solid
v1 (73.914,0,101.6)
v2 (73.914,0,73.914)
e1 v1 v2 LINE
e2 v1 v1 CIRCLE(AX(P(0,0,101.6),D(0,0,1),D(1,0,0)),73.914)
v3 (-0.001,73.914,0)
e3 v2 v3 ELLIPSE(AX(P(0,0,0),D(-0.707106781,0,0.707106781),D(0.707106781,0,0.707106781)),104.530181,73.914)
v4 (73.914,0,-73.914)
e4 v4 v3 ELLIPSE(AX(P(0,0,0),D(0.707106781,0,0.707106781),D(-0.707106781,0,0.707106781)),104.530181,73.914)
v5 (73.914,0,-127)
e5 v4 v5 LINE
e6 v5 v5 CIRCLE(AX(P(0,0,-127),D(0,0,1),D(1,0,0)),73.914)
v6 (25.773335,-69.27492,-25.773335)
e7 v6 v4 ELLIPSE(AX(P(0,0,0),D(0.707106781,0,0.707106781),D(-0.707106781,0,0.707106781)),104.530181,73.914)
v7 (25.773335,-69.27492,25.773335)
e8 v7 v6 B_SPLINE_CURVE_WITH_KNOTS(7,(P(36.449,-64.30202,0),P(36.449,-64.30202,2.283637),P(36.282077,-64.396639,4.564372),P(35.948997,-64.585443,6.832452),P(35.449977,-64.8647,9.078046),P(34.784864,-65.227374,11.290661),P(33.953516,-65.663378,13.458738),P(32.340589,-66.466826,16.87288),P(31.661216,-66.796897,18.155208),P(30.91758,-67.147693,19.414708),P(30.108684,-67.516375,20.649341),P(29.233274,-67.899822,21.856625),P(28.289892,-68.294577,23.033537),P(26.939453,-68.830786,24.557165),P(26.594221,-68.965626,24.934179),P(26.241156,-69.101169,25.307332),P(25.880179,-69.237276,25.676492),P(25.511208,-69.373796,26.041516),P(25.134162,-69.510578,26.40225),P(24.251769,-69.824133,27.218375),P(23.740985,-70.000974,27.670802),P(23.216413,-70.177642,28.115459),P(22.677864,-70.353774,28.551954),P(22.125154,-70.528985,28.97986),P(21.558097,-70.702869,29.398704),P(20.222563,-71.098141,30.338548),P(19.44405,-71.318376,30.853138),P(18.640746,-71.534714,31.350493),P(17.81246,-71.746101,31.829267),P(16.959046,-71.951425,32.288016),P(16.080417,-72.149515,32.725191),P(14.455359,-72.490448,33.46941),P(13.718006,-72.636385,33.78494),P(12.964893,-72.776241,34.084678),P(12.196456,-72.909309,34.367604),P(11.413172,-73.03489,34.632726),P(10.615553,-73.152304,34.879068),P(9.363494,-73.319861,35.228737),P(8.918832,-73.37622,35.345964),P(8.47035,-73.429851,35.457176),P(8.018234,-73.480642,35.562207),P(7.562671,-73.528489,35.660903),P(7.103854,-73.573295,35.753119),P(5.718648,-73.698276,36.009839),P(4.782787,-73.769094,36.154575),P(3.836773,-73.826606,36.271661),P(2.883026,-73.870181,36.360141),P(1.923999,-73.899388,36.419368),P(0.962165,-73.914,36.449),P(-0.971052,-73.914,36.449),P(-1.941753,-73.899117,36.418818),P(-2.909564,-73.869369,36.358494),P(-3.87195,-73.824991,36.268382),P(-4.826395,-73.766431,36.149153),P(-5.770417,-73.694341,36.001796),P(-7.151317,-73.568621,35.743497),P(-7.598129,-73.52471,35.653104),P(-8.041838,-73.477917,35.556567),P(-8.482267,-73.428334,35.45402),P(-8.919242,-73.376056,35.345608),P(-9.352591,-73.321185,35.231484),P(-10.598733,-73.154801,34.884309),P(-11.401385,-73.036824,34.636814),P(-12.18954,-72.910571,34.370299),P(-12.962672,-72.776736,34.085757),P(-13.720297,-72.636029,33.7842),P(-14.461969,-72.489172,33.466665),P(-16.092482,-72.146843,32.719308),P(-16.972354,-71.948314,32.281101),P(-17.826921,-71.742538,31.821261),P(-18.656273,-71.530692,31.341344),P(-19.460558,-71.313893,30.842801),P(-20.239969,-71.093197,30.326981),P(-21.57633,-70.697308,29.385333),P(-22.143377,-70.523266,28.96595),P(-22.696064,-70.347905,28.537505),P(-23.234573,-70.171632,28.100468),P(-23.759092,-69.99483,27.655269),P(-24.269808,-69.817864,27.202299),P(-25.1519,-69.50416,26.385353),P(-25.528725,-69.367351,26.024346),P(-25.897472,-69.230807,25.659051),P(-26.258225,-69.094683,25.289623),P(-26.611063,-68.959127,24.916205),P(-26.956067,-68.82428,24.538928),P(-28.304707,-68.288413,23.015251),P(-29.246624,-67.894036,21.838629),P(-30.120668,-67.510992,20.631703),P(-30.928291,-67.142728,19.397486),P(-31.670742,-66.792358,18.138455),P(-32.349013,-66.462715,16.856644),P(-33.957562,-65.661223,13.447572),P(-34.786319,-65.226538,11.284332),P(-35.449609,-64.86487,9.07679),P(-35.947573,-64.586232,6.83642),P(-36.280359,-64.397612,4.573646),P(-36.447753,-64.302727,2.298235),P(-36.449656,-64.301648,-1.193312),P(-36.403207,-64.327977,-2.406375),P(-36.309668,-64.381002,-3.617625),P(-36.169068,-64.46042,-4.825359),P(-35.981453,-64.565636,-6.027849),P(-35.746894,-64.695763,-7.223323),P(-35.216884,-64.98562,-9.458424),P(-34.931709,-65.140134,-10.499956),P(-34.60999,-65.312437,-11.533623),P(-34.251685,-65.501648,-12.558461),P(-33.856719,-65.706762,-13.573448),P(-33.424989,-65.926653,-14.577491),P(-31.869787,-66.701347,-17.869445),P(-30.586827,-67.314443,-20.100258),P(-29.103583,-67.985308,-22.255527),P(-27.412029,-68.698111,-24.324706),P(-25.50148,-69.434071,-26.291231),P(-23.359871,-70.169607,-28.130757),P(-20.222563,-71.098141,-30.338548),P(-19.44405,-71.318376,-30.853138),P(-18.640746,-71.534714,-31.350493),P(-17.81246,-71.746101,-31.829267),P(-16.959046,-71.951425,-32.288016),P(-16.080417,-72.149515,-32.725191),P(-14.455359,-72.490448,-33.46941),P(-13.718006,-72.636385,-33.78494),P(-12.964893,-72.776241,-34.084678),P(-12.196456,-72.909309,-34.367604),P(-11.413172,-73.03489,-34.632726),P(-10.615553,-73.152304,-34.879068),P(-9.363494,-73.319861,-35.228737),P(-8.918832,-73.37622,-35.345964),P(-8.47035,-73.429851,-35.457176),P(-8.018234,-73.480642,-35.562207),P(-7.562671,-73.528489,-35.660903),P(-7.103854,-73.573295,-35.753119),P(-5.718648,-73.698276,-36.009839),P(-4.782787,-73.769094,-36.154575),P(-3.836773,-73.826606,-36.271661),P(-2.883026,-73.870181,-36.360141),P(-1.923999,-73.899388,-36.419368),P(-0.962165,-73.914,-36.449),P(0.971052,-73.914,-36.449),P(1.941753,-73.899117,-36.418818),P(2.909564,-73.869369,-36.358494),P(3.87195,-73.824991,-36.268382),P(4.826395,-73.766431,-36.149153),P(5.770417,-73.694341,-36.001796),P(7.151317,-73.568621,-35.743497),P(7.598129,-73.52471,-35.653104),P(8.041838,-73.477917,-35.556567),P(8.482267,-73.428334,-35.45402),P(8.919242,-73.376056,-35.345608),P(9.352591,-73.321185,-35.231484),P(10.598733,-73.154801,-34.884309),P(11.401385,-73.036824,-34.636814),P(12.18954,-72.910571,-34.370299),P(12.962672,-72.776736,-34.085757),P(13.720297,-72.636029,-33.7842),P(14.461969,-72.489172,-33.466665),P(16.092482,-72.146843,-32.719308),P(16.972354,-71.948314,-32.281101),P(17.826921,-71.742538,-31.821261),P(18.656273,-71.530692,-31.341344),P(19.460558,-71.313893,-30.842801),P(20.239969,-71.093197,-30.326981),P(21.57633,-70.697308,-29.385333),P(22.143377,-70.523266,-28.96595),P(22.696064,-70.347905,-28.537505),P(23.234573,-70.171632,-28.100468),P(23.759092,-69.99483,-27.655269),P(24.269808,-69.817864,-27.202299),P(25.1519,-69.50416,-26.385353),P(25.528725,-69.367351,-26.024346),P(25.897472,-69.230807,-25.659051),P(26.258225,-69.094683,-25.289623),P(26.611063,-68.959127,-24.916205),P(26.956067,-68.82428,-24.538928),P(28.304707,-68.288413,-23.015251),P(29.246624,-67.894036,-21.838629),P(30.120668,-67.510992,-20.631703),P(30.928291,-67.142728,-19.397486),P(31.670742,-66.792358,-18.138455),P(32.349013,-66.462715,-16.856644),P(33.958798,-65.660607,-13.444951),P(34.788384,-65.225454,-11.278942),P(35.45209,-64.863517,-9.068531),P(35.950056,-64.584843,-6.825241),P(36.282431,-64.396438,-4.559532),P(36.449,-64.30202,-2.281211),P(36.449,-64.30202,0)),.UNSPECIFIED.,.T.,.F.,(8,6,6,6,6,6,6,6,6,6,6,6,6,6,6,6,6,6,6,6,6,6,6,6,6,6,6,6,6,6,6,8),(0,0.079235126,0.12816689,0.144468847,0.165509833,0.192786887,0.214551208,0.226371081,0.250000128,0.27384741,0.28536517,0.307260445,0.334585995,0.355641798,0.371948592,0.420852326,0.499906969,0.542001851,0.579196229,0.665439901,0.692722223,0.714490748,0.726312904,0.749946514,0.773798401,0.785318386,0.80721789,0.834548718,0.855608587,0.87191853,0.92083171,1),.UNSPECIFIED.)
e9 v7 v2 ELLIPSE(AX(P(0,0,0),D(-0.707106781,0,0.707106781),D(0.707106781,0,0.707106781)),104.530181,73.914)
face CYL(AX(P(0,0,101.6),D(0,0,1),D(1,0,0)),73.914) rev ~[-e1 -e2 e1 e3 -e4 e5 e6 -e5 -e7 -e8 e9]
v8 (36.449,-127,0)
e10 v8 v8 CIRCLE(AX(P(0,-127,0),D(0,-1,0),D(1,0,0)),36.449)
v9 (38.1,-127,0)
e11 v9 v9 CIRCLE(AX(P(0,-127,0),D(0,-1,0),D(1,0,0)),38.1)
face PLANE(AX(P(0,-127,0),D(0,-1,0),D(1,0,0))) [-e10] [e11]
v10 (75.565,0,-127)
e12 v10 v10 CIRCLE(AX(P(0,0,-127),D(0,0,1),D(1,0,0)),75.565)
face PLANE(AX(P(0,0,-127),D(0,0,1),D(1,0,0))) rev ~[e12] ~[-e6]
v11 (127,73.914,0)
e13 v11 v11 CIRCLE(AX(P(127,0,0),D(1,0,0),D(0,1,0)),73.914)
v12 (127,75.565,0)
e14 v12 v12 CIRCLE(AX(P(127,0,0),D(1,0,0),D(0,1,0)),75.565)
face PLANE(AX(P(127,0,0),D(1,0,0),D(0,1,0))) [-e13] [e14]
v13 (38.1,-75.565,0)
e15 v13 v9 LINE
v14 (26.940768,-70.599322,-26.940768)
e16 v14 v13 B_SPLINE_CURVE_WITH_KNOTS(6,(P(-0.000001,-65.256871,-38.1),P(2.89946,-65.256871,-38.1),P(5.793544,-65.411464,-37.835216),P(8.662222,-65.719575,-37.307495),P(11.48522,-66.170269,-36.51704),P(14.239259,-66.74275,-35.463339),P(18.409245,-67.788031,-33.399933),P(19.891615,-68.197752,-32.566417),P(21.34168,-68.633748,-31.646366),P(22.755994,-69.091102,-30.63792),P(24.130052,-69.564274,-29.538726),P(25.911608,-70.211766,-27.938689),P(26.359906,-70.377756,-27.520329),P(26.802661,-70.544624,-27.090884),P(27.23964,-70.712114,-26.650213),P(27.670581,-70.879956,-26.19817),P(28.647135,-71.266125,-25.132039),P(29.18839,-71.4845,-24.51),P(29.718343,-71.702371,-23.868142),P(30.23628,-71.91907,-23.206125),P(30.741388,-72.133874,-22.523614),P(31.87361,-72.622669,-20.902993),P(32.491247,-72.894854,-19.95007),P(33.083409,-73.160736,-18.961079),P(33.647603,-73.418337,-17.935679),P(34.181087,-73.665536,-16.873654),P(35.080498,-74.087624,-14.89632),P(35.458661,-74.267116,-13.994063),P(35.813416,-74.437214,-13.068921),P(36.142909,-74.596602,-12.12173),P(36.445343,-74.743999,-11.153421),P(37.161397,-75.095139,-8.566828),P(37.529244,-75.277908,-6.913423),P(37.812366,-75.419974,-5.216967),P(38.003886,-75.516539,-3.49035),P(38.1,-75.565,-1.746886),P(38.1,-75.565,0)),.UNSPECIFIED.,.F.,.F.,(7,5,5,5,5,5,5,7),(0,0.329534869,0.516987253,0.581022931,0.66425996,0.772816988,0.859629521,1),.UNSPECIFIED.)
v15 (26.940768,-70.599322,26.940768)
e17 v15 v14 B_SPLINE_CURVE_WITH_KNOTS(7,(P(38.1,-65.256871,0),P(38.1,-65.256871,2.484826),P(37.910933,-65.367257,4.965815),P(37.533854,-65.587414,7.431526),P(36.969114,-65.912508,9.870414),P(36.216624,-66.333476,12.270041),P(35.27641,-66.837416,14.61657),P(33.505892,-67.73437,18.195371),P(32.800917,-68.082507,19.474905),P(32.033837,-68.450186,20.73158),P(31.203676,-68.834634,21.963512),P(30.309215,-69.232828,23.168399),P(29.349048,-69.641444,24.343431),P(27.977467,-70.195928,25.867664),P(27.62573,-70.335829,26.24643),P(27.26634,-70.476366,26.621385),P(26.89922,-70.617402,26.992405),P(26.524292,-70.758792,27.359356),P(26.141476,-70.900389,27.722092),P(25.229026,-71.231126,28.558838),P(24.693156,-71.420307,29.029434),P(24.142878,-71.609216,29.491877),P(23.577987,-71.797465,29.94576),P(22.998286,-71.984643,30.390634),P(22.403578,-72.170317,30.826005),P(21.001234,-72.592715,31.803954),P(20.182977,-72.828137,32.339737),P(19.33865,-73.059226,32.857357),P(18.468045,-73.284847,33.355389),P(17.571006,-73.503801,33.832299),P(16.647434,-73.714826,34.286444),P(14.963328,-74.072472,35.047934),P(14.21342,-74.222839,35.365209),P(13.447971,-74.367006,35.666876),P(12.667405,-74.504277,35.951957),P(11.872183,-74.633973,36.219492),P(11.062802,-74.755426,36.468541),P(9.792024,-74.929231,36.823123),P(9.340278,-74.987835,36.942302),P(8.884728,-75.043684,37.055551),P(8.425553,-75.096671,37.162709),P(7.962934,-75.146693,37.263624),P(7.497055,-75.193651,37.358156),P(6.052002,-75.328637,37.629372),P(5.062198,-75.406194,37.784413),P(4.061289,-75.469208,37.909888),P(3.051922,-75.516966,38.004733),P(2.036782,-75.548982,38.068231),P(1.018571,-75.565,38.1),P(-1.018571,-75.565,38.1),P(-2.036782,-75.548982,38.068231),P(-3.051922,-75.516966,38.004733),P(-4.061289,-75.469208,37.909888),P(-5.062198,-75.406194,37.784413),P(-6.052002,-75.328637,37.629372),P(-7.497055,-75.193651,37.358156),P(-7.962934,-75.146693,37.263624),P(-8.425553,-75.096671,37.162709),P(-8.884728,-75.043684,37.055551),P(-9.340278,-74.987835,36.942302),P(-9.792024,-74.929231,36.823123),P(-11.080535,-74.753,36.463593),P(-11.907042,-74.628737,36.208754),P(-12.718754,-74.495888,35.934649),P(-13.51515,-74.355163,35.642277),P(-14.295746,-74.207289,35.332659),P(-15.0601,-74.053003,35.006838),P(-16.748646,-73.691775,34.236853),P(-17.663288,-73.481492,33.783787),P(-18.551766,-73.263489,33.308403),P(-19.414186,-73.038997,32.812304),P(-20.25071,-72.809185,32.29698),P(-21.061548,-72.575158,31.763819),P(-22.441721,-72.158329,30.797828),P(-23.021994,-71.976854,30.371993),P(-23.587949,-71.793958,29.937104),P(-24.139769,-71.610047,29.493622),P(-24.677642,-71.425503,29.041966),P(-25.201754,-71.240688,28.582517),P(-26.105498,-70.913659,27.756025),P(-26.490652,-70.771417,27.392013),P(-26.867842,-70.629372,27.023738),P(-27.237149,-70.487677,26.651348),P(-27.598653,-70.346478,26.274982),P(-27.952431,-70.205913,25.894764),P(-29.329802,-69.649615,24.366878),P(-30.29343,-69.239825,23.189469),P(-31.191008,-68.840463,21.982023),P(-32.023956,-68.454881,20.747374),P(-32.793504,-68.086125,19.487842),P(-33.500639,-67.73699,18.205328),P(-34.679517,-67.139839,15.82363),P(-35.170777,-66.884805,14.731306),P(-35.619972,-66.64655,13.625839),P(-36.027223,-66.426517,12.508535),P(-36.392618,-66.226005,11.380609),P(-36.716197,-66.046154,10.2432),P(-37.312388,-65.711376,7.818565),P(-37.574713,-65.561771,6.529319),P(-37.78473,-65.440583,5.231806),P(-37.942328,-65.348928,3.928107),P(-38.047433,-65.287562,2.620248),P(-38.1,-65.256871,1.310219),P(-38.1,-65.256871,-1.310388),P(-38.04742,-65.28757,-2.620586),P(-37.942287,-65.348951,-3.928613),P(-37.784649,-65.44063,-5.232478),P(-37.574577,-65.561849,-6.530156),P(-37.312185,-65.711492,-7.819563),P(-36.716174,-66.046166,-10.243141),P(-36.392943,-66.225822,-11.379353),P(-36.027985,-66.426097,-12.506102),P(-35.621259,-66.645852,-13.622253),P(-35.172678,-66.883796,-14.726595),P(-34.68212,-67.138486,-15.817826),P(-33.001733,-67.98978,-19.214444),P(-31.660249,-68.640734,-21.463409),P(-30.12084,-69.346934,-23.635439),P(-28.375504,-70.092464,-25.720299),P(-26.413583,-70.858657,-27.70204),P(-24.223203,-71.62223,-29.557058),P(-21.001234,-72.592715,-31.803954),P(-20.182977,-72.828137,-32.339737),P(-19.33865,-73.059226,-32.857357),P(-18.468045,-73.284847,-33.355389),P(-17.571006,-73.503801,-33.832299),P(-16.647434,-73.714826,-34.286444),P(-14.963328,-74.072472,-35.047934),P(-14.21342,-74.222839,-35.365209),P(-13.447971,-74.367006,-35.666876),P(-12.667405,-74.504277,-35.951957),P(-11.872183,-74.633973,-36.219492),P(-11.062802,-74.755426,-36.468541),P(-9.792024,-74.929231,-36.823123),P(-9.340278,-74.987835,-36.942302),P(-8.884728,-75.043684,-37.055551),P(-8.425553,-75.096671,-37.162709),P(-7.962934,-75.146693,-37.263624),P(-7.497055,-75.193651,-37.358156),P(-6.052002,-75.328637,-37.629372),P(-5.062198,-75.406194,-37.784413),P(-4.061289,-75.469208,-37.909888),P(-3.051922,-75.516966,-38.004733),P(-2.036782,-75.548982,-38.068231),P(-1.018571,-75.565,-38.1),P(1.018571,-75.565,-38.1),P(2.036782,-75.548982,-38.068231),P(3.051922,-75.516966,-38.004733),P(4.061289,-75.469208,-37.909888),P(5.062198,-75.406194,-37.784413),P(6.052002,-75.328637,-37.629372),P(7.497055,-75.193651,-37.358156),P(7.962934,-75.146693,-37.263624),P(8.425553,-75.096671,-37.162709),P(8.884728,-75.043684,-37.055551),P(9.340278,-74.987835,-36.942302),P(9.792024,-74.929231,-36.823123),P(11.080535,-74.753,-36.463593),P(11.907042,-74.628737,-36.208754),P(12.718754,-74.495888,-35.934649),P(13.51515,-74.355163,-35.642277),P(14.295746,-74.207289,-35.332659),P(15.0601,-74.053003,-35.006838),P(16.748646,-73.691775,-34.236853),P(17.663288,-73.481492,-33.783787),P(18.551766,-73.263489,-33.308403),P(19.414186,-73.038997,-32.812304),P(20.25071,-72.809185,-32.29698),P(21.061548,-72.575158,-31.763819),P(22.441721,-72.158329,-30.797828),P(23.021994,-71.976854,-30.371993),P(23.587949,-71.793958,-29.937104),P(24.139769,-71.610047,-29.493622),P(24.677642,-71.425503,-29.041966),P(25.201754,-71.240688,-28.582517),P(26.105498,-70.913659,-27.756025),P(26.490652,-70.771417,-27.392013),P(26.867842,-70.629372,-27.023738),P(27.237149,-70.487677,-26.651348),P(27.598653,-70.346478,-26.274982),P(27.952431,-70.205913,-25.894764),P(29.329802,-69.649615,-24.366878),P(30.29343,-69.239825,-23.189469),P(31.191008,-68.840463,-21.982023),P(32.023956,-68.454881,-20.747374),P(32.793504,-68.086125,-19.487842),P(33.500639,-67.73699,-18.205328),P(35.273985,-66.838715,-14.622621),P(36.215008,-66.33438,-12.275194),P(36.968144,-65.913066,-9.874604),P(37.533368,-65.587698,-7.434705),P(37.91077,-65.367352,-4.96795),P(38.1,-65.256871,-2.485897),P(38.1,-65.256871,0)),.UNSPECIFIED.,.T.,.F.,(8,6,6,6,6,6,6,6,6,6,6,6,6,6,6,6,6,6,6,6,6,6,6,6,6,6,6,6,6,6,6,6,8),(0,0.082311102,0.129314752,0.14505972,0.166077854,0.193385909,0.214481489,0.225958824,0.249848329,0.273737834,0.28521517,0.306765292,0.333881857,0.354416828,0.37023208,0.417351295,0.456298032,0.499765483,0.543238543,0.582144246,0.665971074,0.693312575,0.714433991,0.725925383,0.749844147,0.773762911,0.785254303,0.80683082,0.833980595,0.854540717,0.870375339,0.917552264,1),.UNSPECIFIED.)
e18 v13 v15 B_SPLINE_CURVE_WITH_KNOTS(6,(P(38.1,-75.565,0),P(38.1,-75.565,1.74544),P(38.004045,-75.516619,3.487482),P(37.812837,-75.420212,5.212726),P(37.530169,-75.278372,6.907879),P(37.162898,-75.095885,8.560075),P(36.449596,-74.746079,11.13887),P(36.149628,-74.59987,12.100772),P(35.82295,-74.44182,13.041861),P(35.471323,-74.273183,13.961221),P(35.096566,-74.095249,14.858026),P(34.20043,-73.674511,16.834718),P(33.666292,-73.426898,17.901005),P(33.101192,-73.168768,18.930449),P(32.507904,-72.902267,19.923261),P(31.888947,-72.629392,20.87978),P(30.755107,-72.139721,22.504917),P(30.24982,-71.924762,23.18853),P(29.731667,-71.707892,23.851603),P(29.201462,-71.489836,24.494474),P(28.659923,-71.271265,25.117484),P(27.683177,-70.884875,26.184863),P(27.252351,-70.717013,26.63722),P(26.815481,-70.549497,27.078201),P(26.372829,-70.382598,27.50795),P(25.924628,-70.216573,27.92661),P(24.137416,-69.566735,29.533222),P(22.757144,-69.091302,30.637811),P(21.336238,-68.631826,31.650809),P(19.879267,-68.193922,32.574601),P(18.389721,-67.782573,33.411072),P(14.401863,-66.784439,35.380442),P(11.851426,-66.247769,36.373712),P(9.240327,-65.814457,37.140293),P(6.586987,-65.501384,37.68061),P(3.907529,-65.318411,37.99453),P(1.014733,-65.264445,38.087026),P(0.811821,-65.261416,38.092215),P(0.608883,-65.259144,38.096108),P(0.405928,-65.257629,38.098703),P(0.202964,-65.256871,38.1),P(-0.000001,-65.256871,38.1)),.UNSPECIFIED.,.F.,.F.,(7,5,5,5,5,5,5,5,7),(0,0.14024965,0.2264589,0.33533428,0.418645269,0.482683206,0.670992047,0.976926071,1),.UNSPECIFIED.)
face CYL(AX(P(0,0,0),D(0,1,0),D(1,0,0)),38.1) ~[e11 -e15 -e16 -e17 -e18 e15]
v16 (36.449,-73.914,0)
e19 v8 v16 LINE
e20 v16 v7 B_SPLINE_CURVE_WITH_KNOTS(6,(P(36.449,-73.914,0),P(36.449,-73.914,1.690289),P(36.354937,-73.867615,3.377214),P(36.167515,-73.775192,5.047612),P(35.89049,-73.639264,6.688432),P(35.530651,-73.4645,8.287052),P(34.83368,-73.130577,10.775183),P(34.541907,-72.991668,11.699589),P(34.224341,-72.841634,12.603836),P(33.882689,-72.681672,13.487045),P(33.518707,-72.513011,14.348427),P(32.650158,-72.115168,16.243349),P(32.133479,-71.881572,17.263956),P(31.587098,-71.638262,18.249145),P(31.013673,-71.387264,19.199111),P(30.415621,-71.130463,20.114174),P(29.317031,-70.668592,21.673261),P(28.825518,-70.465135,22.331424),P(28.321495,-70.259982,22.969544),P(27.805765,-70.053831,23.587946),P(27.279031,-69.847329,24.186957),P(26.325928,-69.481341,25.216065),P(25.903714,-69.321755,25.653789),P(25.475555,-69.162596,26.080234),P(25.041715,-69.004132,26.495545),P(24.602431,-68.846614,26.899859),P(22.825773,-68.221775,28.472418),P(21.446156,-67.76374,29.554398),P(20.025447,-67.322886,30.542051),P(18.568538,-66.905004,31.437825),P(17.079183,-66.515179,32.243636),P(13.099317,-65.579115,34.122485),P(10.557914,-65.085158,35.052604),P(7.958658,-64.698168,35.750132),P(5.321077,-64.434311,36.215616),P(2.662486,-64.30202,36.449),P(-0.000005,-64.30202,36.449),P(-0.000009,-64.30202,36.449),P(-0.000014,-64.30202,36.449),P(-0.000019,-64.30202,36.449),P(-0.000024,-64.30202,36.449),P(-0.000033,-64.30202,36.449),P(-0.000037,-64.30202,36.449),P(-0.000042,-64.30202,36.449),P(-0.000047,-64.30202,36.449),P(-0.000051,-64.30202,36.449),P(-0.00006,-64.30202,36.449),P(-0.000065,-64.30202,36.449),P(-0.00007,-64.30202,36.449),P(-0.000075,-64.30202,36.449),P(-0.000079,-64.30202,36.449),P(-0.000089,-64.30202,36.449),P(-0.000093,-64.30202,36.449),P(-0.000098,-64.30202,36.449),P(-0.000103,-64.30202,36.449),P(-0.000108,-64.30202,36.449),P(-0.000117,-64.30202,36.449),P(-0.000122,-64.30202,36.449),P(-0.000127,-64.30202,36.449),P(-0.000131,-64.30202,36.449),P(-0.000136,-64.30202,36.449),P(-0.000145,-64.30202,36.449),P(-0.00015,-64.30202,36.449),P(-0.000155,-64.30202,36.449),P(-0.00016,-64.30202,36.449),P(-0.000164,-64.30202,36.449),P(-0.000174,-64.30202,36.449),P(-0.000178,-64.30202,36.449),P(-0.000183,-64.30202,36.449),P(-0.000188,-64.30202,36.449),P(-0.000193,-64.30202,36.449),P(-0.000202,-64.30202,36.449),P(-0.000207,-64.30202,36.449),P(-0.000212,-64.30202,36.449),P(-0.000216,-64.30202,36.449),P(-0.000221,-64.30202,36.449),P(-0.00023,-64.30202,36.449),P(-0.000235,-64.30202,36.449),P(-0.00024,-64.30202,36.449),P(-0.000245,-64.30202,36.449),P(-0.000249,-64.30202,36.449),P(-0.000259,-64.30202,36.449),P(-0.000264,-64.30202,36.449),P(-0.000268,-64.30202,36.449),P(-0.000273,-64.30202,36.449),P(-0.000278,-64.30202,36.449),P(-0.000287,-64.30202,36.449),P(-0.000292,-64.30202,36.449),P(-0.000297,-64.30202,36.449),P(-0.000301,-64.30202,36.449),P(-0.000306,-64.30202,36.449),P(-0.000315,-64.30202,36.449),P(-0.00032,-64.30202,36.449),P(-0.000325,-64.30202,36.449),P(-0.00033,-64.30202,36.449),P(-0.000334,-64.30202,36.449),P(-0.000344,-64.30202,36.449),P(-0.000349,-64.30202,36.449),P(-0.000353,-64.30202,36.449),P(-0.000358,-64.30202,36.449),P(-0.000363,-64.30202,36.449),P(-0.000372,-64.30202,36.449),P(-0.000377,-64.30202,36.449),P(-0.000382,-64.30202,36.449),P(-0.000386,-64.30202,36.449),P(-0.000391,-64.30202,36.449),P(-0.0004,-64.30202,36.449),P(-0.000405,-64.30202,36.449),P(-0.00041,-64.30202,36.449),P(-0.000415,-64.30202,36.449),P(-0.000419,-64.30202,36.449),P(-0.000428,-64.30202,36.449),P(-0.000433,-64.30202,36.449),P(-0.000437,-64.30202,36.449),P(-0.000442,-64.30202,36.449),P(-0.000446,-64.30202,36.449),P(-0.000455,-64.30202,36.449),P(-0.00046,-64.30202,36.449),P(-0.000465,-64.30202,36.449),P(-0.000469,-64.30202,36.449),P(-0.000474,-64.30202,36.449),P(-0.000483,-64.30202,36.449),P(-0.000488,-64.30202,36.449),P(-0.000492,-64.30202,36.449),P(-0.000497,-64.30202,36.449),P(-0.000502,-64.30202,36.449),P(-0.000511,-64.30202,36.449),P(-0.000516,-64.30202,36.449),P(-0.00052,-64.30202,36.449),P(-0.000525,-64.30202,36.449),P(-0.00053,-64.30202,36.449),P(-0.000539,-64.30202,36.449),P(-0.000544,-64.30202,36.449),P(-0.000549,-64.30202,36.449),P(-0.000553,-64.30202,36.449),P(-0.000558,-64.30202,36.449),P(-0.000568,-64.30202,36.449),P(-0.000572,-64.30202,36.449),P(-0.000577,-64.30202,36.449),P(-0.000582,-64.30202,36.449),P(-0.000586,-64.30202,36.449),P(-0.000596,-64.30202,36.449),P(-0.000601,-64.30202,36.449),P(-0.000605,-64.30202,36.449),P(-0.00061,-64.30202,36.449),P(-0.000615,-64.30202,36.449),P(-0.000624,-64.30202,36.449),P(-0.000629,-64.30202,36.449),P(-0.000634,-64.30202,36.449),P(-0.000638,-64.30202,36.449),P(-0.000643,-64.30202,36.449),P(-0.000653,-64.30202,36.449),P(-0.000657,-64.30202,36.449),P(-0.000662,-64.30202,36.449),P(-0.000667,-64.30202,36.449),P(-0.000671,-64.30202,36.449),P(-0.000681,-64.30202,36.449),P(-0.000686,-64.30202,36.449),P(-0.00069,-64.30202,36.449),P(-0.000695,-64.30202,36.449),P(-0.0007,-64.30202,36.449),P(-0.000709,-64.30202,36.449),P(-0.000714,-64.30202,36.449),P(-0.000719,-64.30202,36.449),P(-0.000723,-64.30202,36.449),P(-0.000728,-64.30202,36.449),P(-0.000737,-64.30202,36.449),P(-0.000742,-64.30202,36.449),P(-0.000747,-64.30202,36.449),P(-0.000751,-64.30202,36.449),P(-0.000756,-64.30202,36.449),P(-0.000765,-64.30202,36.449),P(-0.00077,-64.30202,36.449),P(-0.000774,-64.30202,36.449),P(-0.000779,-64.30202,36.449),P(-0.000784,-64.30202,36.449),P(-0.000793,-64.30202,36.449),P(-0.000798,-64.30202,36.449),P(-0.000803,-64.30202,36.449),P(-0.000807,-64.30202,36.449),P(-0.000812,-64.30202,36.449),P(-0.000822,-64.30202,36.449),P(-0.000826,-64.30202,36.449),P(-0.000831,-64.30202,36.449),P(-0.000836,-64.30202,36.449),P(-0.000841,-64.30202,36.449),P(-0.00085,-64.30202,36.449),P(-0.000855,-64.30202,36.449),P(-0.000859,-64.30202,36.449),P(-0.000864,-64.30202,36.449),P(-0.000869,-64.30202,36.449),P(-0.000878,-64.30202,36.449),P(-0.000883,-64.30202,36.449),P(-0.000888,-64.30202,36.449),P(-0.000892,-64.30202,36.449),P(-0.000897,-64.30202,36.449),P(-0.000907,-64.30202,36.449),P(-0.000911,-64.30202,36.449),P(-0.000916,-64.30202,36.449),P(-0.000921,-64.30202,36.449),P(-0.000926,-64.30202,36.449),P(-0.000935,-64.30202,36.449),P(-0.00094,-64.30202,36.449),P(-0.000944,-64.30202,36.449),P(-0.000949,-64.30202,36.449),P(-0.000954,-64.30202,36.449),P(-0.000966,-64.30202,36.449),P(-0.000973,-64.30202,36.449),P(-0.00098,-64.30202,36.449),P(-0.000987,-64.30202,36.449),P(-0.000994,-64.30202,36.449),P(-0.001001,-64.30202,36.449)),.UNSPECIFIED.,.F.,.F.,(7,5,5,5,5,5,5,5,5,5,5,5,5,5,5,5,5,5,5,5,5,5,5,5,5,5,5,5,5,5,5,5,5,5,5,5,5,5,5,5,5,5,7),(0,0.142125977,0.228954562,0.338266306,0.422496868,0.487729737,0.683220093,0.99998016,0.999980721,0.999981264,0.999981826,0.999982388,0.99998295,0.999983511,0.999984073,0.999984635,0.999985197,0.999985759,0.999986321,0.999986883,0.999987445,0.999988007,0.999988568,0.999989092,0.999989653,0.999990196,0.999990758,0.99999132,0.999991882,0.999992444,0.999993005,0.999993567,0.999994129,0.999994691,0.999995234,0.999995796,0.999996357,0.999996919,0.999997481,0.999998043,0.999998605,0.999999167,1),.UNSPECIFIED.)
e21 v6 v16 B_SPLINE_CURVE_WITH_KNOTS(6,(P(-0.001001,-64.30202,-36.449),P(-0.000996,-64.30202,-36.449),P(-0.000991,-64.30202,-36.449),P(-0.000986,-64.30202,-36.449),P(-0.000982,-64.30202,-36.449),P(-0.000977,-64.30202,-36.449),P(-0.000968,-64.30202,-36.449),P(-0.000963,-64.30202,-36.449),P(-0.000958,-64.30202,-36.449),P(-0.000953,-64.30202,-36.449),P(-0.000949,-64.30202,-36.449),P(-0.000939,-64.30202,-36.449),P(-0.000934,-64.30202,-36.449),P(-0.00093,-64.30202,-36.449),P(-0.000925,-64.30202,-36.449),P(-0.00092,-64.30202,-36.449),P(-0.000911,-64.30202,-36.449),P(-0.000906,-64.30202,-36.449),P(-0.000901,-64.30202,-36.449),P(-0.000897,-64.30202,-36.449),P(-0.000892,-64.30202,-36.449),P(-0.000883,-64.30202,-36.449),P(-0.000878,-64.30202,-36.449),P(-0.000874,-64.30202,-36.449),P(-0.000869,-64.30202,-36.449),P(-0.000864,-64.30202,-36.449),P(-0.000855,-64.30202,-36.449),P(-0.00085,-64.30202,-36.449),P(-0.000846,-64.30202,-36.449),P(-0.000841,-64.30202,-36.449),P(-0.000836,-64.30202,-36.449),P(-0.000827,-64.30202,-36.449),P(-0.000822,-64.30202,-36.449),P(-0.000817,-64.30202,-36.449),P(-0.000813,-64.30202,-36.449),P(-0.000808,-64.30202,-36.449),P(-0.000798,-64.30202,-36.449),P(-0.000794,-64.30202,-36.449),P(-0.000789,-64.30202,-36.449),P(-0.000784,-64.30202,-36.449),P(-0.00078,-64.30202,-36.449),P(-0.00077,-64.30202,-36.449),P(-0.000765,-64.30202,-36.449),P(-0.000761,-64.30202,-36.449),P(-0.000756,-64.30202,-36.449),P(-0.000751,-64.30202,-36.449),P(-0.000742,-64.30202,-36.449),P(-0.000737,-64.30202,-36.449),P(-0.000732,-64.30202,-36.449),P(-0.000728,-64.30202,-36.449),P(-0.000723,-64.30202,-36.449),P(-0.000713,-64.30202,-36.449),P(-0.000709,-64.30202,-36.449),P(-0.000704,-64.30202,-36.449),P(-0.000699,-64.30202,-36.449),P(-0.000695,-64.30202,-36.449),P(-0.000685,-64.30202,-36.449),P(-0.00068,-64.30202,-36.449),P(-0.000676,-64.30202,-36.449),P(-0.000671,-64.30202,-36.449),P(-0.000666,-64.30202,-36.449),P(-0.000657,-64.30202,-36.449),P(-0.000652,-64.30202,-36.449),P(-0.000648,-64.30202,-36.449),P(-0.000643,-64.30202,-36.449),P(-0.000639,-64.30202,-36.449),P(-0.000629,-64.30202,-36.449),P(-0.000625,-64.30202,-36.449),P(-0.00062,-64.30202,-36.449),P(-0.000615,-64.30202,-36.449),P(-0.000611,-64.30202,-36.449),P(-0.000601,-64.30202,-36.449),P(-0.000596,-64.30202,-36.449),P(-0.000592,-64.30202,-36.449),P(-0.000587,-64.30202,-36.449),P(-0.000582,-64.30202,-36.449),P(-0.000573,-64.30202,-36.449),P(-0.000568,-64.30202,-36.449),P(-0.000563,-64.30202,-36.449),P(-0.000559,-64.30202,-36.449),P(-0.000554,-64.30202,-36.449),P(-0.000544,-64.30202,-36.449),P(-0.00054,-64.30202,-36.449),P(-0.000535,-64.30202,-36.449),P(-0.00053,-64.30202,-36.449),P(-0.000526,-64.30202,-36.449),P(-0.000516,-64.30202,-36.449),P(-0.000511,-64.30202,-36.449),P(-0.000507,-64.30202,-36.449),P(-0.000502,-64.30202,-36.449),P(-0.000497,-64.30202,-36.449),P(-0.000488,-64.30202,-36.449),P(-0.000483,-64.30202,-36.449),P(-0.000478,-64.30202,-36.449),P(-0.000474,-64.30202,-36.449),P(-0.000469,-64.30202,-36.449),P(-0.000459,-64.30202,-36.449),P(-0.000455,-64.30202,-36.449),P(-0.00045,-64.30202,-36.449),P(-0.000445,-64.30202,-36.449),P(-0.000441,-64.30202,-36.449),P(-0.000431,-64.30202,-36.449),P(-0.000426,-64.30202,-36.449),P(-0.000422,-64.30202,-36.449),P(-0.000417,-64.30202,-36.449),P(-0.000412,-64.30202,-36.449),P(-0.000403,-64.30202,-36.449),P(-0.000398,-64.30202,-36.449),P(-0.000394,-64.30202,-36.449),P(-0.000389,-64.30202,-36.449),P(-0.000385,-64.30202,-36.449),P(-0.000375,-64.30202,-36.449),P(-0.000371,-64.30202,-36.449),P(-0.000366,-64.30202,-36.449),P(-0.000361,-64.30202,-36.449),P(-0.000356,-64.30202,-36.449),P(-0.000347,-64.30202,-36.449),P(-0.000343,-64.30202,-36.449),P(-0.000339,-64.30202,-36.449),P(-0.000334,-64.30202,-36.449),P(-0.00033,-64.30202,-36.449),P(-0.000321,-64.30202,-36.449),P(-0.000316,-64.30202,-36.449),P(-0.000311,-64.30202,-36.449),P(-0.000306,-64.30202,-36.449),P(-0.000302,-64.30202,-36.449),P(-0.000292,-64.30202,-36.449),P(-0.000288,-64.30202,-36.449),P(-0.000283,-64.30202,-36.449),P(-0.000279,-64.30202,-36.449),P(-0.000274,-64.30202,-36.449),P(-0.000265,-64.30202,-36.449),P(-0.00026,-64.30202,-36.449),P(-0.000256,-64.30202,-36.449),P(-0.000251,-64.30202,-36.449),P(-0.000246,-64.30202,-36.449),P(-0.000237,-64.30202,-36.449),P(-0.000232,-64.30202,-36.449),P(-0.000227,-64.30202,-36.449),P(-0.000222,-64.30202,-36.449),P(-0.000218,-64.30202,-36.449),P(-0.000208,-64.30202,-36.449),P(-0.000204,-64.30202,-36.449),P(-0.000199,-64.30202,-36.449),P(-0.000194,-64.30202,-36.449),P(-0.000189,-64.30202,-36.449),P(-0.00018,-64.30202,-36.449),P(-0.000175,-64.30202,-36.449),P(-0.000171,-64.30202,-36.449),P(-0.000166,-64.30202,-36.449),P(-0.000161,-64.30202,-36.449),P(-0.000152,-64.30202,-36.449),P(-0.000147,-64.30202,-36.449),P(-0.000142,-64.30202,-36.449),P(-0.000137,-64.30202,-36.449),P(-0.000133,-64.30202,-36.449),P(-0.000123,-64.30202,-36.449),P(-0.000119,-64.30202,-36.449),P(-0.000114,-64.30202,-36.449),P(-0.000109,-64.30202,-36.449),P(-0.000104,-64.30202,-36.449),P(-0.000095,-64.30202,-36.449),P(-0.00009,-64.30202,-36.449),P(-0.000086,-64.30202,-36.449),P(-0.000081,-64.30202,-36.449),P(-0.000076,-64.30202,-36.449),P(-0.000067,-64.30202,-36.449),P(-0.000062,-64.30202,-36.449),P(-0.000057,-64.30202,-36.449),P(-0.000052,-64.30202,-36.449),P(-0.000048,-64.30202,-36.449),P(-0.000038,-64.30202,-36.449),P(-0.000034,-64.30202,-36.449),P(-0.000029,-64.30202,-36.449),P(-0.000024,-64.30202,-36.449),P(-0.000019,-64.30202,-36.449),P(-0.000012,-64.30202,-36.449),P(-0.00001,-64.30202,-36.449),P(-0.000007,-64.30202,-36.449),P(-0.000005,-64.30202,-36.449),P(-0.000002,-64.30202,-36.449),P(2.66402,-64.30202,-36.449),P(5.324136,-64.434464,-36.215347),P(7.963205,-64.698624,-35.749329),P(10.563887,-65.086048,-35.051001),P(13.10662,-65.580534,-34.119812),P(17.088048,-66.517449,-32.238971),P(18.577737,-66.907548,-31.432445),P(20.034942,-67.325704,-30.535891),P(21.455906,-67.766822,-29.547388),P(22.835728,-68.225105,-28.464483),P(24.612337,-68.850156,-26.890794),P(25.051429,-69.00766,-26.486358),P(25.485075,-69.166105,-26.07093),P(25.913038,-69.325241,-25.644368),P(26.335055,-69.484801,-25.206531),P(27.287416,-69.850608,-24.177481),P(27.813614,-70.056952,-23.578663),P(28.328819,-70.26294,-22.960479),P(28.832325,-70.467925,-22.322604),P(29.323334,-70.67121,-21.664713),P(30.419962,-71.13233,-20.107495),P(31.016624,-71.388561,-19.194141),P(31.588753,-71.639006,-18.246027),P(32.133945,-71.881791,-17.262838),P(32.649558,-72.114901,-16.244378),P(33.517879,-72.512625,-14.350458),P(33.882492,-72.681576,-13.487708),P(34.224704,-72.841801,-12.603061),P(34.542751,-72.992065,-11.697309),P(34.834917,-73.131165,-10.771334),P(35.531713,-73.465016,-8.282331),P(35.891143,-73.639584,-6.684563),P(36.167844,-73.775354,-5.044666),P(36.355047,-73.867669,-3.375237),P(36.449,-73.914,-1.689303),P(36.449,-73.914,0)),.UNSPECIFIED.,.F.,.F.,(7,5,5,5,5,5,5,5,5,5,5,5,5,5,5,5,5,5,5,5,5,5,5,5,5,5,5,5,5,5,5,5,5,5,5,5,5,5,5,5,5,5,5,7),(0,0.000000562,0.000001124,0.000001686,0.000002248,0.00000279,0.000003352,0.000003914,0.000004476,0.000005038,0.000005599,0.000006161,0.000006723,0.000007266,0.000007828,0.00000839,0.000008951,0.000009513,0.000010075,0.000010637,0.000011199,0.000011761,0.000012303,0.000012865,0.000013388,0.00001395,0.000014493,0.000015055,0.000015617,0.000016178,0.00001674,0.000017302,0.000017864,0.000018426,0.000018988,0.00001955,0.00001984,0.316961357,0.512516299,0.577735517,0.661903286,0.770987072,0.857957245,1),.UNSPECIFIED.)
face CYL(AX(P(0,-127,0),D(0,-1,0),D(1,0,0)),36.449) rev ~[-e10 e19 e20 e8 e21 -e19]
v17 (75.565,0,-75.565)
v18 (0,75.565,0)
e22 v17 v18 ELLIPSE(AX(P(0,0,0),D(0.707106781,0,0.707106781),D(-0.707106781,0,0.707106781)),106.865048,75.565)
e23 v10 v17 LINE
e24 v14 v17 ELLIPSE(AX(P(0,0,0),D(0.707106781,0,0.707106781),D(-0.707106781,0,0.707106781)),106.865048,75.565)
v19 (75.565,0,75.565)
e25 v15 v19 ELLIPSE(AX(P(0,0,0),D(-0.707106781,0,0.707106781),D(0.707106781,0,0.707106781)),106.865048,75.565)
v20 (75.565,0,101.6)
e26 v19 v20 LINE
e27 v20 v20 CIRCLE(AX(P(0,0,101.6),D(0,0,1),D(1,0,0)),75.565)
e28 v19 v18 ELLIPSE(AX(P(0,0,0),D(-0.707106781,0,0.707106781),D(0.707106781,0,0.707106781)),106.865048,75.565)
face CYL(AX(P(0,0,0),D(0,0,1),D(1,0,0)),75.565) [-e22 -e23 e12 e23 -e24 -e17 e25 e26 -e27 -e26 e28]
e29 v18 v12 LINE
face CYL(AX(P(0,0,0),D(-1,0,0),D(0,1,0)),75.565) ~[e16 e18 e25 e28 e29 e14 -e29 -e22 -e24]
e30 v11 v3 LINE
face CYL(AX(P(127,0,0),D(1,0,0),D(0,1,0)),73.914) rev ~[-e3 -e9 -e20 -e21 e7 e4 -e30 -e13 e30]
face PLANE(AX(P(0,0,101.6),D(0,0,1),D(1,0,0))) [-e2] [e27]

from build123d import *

# Parameters (mm, degrees)
F0_R      = 75.565
F1_DEPTH  = 101.6
F2_DEPTH  = 127
F3_R      = 38.1
F4_DEPTH  = 127
F5_R      = 75.565
F6_DEPTH  = 127
F7_R      = 73.914
F8_DEPTH  = 228.6010001
F9_R      = 73.914
F10_DEPTH = 127.001
F11_R     = 36.449
F12_DEPTH = 62.6989799529


with BuildPart() as f1:
    # F0 (on Top) → F1 (new body)
    with BuildSketch(Plane.XY):
        Circle(F0_R)
    extrude(amount=F1_DEPTH)

    # F0 (on Top) → F2 (join)
    with BuildSketch(Plane.XY):
        Circle(F0_R)
    extrude(amount=-F2_DEPTH)

    # F3 (on Front) → F4 (join)
    with BuildSketch(Plane.XZ):
        Circle(F3_R)
    extrude(amount=F4_DEPTH)

    # F5 (on Right) → F6 (join)
    with BuildSketch(Plane.YZ):
        Circle(F5_R)
    extrude(amount=F6_DEPTH)

    # F7 (on face) → F8 (cut, through all)
    with BuildSketch(Plane.XY.offset(101.6)):
        Circle(F7_R)
    extrude(amount=-F8_DEPTH, mode=Mode.SUBTRACT)

    # F9 (on face) → F10 (cut, through all)
    with BuildSketch(Plane.YZ.offset(127)):
        Circle(F9_R)
    extrude(amount=-F10_DEPTH, mode=Mode.SUBTRACT)

    # F11 (on face) → F12 (cut, through all)
    with BuildSketch(Plane.XZ.offset(127)):
        Circle(F11_R)
    extrude(amount=-F12_DEPTH, mode=Mode.SUBTRACT)


solid = f1.part
